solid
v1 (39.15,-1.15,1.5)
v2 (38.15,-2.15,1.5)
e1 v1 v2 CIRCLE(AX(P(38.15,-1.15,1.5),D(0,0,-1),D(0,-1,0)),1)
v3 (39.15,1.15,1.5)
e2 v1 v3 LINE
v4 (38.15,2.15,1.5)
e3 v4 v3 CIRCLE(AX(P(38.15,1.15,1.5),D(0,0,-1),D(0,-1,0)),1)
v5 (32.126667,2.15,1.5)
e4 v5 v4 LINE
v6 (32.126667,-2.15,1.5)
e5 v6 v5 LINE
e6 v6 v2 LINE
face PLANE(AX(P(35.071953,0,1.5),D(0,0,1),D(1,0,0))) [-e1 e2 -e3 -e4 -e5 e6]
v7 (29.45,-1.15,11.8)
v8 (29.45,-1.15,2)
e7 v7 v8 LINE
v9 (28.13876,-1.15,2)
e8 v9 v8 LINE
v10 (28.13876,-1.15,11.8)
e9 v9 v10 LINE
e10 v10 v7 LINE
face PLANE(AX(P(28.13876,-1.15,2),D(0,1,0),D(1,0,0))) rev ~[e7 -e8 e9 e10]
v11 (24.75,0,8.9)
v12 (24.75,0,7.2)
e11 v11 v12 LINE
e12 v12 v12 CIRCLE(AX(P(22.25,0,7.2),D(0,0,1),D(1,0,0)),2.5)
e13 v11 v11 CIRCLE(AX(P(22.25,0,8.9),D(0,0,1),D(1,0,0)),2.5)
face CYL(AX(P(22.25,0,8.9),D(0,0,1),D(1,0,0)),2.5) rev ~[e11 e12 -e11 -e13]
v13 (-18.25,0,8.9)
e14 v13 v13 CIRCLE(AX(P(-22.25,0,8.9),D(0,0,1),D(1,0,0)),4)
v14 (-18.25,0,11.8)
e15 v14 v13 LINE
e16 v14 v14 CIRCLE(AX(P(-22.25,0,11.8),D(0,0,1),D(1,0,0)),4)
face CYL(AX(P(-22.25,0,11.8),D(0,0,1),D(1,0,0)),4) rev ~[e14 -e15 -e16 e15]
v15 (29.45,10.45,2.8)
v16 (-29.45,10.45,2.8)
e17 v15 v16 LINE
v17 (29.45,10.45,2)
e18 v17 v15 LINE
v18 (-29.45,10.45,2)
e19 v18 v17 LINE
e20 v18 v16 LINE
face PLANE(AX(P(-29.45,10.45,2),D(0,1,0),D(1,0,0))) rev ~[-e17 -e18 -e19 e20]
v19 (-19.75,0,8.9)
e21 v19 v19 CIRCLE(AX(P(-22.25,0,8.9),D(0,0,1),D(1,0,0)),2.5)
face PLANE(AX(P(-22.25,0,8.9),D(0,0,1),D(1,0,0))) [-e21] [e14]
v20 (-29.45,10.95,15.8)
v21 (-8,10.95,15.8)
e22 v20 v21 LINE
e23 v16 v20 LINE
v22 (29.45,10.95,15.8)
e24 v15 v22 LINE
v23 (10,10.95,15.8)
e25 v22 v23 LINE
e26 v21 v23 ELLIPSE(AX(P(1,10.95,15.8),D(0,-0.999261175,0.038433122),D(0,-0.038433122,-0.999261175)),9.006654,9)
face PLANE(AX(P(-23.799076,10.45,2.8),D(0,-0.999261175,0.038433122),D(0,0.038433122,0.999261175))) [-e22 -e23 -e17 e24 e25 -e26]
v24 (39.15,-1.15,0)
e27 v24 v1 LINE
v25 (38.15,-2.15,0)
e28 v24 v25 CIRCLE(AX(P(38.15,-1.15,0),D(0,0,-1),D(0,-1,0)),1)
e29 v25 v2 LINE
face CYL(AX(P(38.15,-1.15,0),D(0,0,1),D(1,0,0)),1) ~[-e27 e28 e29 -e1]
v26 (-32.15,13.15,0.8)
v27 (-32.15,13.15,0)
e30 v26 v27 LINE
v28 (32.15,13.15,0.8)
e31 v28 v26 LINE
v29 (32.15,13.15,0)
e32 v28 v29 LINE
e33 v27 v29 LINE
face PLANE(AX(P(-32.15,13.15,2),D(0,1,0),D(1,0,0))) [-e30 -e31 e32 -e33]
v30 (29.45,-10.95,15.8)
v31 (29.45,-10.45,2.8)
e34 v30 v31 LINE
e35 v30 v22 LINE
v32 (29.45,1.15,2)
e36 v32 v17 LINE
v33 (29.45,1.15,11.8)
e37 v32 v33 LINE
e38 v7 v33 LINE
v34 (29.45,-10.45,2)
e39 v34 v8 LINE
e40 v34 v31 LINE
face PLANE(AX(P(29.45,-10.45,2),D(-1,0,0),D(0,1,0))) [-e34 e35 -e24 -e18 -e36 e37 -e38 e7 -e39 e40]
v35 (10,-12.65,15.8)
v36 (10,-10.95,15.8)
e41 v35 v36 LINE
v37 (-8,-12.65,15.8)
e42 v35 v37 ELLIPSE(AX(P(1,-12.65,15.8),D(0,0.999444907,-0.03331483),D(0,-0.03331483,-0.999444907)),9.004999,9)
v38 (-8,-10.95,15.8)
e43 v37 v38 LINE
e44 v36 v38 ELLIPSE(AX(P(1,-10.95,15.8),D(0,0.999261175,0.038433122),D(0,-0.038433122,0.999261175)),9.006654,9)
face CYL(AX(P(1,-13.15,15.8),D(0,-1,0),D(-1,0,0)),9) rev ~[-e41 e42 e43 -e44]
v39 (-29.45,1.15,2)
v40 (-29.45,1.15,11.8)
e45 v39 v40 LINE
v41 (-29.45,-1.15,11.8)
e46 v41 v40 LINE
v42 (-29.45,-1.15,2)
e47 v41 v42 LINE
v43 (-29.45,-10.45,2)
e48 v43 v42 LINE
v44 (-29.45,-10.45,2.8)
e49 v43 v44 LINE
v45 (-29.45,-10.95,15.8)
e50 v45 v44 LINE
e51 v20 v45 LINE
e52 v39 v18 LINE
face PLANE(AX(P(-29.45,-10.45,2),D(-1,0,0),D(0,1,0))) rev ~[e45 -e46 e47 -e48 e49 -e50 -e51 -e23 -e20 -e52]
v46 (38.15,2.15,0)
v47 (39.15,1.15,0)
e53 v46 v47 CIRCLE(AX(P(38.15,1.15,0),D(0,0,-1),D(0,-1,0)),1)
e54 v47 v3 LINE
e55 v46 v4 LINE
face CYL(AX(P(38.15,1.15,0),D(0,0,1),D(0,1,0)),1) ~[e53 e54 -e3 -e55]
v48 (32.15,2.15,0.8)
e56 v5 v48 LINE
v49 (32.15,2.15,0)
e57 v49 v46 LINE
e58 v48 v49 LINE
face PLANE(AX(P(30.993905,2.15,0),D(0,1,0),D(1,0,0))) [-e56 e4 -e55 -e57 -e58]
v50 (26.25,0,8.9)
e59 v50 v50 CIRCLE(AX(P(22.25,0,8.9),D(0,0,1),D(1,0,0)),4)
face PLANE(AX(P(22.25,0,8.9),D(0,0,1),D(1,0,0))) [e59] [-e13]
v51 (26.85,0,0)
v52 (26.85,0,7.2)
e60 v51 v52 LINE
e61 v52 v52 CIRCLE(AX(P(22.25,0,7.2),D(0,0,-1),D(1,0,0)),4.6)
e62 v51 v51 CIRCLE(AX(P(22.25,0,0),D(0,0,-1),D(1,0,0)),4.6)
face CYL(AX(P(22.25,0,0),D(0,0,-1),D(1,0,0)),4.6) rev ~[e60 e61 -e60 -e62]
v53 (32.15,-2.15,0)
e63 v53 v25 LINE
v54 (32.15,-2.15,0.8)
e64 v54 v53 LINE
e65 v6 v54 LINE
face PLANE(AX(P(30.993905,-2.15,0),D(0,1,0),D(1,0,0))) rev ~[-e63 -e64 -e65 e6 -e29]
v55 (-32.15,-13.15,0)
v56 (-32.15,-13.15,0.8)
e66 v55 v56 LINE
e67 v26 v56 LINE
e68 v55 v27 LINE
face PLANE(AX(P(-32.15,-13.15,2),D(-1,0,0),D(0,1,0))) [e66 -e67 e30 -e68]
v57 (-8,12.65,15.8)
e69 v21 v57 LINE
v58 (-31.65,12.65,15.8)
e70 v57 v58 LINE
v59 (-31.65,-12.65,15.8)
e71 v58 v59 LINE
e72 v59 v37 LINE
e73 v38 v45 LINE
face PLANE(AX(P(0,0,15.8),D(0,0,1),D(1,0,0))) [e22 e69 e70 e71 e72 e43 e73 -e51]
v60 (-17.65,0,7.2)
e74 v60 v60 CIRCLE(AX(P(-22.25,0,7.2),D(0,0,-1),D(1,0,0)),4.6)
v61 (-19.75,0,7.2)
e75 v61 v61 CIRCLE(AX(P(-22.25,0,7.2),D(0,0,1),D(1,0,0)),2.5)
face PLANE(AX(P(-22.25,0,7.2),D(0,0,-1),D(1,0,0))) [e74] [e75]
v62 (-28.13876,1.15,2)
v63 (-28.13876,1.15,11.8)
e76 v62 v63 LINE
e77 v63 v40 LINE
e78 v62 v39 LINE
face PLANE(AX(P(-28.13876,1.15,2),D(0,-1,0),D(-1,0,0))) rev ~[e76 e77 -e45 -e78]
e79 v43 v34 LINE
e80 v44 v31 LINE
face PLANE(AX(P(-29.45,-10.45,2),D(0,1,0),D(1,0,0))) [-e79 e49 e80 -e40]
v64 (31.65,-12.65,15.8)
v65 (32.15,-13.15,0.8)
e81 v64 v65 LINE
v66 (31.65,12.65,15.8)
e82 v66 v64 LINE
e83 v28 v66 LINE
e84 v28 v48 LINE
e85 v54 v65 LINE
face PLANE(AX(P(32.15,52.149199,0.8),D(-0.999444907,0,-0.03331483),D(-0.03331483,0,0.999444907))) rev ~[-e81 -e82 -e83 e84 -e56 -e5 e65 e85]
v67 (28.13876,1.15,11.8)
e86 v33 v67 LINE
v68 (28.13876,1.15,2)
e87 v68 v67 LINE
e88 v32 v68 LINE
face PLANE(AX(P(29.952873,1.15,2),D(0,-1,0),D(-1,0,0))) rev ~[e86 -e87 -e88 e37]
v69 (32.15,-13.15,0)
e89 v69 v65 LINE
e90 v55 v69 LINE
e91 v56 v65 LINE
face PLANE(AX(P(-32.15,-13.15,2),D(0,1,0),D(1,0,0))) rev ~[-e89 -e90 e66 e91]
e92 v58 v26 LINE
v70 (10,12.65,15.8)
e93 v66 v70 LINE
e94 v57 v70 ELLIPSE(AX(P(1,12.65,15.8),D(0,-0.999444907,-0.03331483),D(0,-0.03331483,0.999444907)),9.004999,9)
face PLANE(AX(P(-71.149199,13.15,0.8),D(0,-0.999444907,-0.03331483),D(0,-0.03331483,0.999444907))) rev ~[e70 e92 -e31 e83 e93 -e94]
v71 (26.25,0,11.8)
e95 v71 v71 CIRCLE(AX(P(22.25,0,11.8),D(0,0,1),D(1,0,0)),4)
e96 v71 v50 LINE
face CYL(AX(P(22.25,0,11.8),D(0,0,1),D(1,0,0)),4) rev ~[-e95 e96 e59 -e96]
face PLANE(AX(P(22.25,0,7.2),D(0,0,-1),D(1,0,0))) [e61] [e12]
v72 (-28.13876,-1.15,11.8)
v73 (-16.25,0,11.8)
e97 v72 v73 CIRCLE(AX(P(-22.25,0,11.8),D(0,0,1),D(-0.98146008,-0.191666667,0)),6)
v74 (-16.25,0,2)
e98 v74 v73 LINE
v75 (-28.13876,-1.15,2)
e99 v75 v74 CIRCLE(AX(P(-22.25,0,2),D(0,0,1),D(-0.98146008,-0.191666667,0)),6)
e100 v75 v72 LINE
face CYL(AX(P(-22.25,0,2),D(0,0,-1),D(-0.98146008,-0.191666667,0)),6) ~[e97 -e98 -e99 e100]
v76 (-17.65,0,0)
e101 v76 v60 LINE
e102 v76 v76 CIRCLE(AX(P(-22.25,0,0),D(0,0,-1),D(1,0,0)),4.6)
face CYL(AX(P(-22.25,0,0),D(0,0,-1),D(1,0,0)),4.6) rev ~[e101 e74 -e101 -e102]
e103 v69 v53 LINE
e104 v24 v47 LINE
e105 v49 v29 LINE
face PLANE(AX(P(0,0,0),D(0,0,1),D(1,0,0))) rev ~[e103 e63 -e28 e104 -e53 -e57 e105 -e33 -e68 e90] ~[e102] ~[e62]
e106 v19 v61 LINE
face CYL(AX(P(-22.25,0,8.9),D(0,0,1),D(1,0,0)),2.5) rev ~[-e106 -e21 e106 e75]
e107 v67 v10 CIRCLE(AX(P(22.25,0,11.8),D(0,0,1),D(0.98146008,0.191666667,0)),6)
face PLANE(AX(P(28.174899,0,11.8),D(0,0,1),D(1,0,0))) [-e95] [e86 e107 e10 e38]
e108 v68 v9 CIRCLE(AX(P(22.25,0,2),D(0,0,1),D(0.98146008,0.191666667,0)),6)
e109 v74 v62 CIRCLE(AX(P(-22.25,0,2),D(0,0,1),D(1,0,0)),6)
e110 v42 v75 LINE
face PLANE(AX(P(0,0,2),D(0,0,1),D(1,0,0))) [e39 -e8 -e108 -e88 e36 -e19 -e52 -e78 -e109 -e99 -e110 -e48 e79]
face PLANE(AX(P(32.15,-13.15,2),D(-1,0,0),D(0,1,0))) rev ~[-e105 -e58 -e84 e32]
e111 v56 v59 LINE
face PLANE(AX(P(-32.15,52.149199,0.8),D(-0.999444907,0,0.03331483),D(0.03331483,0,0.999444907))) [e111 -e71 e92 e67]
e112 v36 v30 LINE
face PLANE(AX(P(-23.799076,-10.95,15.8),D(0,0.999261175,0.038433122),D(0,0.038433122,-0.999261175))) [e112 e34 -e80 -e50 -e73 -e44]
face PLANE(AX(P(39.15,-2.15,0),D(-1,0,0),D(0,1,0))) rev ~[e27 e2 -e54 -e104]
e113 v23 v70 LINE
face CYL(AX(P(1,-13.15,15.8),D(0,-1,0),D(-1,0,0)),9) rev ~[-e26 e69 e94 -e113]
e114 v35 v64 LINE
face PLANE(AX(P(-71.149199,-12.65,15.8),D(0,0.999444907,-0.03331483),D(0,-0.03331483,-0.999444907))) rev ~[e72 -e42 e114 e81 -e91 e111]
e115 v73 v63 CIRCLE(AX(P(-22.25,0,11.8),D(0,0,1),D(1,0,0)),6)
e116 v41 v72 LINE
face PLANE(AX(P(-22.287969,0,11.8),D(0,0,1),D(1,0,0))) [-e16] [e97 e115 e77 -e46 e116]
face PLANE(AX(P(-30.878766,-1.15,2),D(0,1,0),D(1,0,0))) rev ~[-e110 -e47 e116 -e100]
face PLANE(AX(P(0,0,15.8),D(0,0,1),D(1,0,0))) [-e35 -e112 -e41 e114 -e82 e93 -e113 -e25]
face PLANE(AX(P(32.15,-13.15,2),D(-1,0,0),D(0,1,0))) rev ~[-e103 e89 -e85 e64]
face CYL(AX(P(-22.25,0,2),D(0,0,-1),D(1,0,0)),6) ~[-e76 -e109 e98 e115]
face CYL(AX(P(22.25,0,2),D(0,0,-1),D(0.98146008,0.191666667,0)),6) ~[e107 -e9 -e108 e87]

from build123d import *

# Parameters (mm, degrees)
F0_W         = 64.3
F0_H         = 26.3
F1_DEPTH     = 2
F2_W         = 64.3
F2_H         = 26.3
F2_W_2       = 58.9
F2_H_2       = 20.9
F3_DEPTH     = 13.8
F5_DEPTH     = 26.5
F7_DEPTH     = 9.8
F8_R         = 4
F9_DEPTH     = 2.9
F10_R        = 4
F11_DEPTH    = 2.9
F12_R        = 2.5
F13_DEPTH    = 9
F14_R        = 2.5
F15_DEPTH    = 9
F16_R        = 4.6
F17_DEPTH    = 7.2
F18_T1_DEPTH = 102.1483987537
F18_T3_DEPTH = 104.2983987537
F18_T5_DEPTH = 100.1483987537
F19_T1_DEPTH = 53.2490764557
F19_T3_DEPTH = 55.2490764557
F20_W        = 8.1560949282
F20_H        = 4.3
F21_DEPTH    = 1.5
F22_R        = 1


# Not quite as in the source:
# - a fillet or chamfer that OpenCascade refuses, or shapes differently, is made with other operations: its cross-section is extruded or revolved along the edge and cut away or added


with BuildPart() as f1:
    # F0 (on Top) → F1 (new body)
    with BuildSketch(Plane.XY):
        Rectangle(F0_W, F0_H)
    extrude(amount=F1_DEPTH)

    # F2 (on face) → F3 (join)
    with BuildSketch(Plane.XY.offset(2)):
        Rectangle(F2_W, F2_H)
        Rectangle(F2_W_2, F2_H_2, mode=Mode.SUBTRACT)
    extrude(amount=F3_DEPTH)

    # F4 (on face) → F5 (cut)
    with BuildSketch(Plane.XZ.offset(13.15)):
        with BuildLine():
            ThreePointArc((-8, 15.8), (1, 6.8), (10, 15.8))
            Line((10, 15.8), (-8, 15.8))
        make_face()
    extrude(amount=-F5_DEPTH, mode=Mode.SUBTRACT)

    # F6 (on face) → F7 (join)
    with BuildSketch(Plane.XY.offset(2)):
        with BuildLine():
            ThreePointArc((-28.1387604808, -1.15), (-21.6723162131, -5.9721253706), (-16.25, 0))
            ThreePointArc((-16.25, 0), (-21.6723162131, 5.9721253706), (-28.1387604808, 1.15))
            Line((-28.1387604808, 1.15), (-28.1387604808, -1.15))
        make_face()
        with BuildLine():
            Line((-28.1387604808, -1.15), (-28.1387604808, 1.15))
            ThreePointArc((-28.1387604808, 1.15), (-28.25, 0), (-28.1387604808, -1.15))
        make_face()
        with BuildLine():
            ThreePointArc((-28.1387604808, -1.15), (-28.25, 0), (-28.1387604808, 1.15))
            Line((-28.1387604808, 1.15), (-30.8787655085, 1.15))
            Line((-30.8787655085, 1.15), (-30.8787655085, -1.15))
            Line((-30.8787655085, -1.15), (-29.45, -1.15))
            Line((-29.45, -1.15), (-28.1387604808, -1.15))
        make_face()
        with BuildLine():
            ThreePointArc((28.1387604808, -1.15), (28.2221253706, -0.5776837869), (28.25, 0))
            ThreePointArc((28.25, 0), (28.2221253706, 0.5776837869), (28.1387604808, 1.15))
            Line((28.1387604808, 1.15), (28.1387604808, -1.15))
        make_face()
        with BuildLine():
            ThreePointArc((28.1387604808, 1.15), (28.2221253706, 0.5776837869), (28.25, 0))
            ThreePointArc((28.25, 0), (28.2221253706, -0.5776837869), (28.1387604808, -1.15))
            Line((28.1387604808, -1.15), (29.9528725445, -1.15))
            Line((29.9528725445, -1.15), (29.9528725445, 1.15))
            Line((29.9528725445, 1.15), (28.1387604808, 1.15))
        make_face()
        with BuildLine():
            Line((28.1387604808, -1.15), (28.1387604808, 1.15))
            ThreePointArc((28.1387604808, 1.15), (16.25, 0), (28.1387604808, -1.15))
        make_face()
    extrude(amount=F7_DEPTH)

    # F8 (on face) → F9 (cut)
    with BuildSketch(Plane.XY.offset(11.8)):
        with Locations((-22.25, 0)):
            Circle(F8_R)
    extrude(amount=-F9_DEPTH, mode=Mode.SUBTRACT)

    # F10 (on face) → F11 (cut)
    with BuildSketch(Plane.XY.offset(11.8)):
        with Locations((22.25, 0)):
            Circle(F10_R)
    extrude(amount=-F11_DEPTH, mode=Mode.SUBTRACT)

    # F12 (on face) → F13 (cut)
    with BuildSketch(Plane.XY.offset(8.9)):
        with Locations((-22.25, 0)):
            Circle(F12_R)
    extrude(amount=-F13_DEPTH, mode=Mode.SUBTRACT)

    # F14 (on face) → F15 (cut)
    with BuildSketch(Plane.XY.offset(8.9)):
        with Locations((22.25, 0)):
            Circle(F14_R)
    extrude(amount=-F15_DEPTH, mode=Mode.SUBTRACT)

    # F16 (on face) → F17 (cut)
    with BuildSketch(Plane(origin=(0, 0, 0), x_dir=(1, 0, 0), z_dir=(0, 0, -1))):
        with Locations((-22.25, 0)):
            Circle(F16_R)
        with Locations((22.25, 0)):
            Circle(F16_R)
    extrude(amount=-F17_DEPTH, mode=Mode.SUBTRACT)

    # F18: chamfer of 15 x 0.5 on 6 edges, made by hand

    # F18_s2 → F18_t1 (cut)
    with BuildSketch(Plane.YZ.offset(-71.1491993768)):
        Polygon((13.15, 0.8), (12.65, 15.8), (13.15, 15.8), align=None)
        Polygon((-12.65, 15.8), (-13.15, 0.8), (-13.15, 15.8), align=None)
    extrude(amount=F18_T1_DEPTH, mode=Mode.SUBTRACT)

    # F18_s4 → F18_t3 (cut)
    with BuildSketch(Plane.XZ.offset(-52.1491993768)):
        Polygon((32.15, 0.8), (31.65, 15.8), (32.15, 15.8), align=None)
        Polygon((-32.15, 0.8), (-31.65, 15.8), (-32.15, 15.8), align=None)
    extrude(amount=F18_T3_DEPTH, mode=Mode.SUBTRACT)

    # F18_s6 → F18_t5 (cut)
    with BuildSketch(Plane.YZ.offset(-28.9991993768)):
        Polygon((13.15, 0.8), (12.65, 15.8), (13.15, 15.8), align=None)
        Polygon((-12.65, 15.8), (-13.15, 0.8), (-13.15, 15.8), align=None)
    extrude(amount=F18_T5_DEPTH, mode=Mode.SUBTRACT)

    # F19: chamfer of 13 x 0.5 on 4 edges, made by hand

    # F19_s2 → F19_t1 (cut)
    with BuildSketch(Plane.YZ.offset(-23.7990764557)):
        Polygon((-10.95, 15.8), (-10.45, 2.8), (-10.45, 15.8), align=None)
        Polygon((10.45, 2.8), (10.95, 15.8), (10.45, 15.8), align=None)
    extrude(amount=F19_T1_DEPTH, mode=Mode.SUBTRACT)

    # F19_s4 → F19_t3 (cut)
    with BuildSketch(Plane.YZ.offset(-29.45)):
        Polygon((10.45, 2.8), (10.95, 15.8), (10.45, 15.8), align=None)
        Polygon((-10.95, 15.8), (-10.45, 2.8), (-10.45, 15.8), align=None)
    extrude(amount=F19_T3_DEPTH, mode=Mode.SUBTRACT)

    # F20 (on Top) → F21 (join)
    with BuildSketch(Plane.XY):
        with Locations((35.0719525359, 0)):
            Rectangle(F20_W, F20_H)
    extrude(amount=F21_DEPTH)

    # F22
    f22_edges = [f1.edges().sort_by_distance(p)[0] for p in [
        (39.15, 2.15, 0.75),
        (39.15, -2.15, 0.75),
    ]]
    fillet(f22_edges, radius=F22_R)


solid = f1.part
